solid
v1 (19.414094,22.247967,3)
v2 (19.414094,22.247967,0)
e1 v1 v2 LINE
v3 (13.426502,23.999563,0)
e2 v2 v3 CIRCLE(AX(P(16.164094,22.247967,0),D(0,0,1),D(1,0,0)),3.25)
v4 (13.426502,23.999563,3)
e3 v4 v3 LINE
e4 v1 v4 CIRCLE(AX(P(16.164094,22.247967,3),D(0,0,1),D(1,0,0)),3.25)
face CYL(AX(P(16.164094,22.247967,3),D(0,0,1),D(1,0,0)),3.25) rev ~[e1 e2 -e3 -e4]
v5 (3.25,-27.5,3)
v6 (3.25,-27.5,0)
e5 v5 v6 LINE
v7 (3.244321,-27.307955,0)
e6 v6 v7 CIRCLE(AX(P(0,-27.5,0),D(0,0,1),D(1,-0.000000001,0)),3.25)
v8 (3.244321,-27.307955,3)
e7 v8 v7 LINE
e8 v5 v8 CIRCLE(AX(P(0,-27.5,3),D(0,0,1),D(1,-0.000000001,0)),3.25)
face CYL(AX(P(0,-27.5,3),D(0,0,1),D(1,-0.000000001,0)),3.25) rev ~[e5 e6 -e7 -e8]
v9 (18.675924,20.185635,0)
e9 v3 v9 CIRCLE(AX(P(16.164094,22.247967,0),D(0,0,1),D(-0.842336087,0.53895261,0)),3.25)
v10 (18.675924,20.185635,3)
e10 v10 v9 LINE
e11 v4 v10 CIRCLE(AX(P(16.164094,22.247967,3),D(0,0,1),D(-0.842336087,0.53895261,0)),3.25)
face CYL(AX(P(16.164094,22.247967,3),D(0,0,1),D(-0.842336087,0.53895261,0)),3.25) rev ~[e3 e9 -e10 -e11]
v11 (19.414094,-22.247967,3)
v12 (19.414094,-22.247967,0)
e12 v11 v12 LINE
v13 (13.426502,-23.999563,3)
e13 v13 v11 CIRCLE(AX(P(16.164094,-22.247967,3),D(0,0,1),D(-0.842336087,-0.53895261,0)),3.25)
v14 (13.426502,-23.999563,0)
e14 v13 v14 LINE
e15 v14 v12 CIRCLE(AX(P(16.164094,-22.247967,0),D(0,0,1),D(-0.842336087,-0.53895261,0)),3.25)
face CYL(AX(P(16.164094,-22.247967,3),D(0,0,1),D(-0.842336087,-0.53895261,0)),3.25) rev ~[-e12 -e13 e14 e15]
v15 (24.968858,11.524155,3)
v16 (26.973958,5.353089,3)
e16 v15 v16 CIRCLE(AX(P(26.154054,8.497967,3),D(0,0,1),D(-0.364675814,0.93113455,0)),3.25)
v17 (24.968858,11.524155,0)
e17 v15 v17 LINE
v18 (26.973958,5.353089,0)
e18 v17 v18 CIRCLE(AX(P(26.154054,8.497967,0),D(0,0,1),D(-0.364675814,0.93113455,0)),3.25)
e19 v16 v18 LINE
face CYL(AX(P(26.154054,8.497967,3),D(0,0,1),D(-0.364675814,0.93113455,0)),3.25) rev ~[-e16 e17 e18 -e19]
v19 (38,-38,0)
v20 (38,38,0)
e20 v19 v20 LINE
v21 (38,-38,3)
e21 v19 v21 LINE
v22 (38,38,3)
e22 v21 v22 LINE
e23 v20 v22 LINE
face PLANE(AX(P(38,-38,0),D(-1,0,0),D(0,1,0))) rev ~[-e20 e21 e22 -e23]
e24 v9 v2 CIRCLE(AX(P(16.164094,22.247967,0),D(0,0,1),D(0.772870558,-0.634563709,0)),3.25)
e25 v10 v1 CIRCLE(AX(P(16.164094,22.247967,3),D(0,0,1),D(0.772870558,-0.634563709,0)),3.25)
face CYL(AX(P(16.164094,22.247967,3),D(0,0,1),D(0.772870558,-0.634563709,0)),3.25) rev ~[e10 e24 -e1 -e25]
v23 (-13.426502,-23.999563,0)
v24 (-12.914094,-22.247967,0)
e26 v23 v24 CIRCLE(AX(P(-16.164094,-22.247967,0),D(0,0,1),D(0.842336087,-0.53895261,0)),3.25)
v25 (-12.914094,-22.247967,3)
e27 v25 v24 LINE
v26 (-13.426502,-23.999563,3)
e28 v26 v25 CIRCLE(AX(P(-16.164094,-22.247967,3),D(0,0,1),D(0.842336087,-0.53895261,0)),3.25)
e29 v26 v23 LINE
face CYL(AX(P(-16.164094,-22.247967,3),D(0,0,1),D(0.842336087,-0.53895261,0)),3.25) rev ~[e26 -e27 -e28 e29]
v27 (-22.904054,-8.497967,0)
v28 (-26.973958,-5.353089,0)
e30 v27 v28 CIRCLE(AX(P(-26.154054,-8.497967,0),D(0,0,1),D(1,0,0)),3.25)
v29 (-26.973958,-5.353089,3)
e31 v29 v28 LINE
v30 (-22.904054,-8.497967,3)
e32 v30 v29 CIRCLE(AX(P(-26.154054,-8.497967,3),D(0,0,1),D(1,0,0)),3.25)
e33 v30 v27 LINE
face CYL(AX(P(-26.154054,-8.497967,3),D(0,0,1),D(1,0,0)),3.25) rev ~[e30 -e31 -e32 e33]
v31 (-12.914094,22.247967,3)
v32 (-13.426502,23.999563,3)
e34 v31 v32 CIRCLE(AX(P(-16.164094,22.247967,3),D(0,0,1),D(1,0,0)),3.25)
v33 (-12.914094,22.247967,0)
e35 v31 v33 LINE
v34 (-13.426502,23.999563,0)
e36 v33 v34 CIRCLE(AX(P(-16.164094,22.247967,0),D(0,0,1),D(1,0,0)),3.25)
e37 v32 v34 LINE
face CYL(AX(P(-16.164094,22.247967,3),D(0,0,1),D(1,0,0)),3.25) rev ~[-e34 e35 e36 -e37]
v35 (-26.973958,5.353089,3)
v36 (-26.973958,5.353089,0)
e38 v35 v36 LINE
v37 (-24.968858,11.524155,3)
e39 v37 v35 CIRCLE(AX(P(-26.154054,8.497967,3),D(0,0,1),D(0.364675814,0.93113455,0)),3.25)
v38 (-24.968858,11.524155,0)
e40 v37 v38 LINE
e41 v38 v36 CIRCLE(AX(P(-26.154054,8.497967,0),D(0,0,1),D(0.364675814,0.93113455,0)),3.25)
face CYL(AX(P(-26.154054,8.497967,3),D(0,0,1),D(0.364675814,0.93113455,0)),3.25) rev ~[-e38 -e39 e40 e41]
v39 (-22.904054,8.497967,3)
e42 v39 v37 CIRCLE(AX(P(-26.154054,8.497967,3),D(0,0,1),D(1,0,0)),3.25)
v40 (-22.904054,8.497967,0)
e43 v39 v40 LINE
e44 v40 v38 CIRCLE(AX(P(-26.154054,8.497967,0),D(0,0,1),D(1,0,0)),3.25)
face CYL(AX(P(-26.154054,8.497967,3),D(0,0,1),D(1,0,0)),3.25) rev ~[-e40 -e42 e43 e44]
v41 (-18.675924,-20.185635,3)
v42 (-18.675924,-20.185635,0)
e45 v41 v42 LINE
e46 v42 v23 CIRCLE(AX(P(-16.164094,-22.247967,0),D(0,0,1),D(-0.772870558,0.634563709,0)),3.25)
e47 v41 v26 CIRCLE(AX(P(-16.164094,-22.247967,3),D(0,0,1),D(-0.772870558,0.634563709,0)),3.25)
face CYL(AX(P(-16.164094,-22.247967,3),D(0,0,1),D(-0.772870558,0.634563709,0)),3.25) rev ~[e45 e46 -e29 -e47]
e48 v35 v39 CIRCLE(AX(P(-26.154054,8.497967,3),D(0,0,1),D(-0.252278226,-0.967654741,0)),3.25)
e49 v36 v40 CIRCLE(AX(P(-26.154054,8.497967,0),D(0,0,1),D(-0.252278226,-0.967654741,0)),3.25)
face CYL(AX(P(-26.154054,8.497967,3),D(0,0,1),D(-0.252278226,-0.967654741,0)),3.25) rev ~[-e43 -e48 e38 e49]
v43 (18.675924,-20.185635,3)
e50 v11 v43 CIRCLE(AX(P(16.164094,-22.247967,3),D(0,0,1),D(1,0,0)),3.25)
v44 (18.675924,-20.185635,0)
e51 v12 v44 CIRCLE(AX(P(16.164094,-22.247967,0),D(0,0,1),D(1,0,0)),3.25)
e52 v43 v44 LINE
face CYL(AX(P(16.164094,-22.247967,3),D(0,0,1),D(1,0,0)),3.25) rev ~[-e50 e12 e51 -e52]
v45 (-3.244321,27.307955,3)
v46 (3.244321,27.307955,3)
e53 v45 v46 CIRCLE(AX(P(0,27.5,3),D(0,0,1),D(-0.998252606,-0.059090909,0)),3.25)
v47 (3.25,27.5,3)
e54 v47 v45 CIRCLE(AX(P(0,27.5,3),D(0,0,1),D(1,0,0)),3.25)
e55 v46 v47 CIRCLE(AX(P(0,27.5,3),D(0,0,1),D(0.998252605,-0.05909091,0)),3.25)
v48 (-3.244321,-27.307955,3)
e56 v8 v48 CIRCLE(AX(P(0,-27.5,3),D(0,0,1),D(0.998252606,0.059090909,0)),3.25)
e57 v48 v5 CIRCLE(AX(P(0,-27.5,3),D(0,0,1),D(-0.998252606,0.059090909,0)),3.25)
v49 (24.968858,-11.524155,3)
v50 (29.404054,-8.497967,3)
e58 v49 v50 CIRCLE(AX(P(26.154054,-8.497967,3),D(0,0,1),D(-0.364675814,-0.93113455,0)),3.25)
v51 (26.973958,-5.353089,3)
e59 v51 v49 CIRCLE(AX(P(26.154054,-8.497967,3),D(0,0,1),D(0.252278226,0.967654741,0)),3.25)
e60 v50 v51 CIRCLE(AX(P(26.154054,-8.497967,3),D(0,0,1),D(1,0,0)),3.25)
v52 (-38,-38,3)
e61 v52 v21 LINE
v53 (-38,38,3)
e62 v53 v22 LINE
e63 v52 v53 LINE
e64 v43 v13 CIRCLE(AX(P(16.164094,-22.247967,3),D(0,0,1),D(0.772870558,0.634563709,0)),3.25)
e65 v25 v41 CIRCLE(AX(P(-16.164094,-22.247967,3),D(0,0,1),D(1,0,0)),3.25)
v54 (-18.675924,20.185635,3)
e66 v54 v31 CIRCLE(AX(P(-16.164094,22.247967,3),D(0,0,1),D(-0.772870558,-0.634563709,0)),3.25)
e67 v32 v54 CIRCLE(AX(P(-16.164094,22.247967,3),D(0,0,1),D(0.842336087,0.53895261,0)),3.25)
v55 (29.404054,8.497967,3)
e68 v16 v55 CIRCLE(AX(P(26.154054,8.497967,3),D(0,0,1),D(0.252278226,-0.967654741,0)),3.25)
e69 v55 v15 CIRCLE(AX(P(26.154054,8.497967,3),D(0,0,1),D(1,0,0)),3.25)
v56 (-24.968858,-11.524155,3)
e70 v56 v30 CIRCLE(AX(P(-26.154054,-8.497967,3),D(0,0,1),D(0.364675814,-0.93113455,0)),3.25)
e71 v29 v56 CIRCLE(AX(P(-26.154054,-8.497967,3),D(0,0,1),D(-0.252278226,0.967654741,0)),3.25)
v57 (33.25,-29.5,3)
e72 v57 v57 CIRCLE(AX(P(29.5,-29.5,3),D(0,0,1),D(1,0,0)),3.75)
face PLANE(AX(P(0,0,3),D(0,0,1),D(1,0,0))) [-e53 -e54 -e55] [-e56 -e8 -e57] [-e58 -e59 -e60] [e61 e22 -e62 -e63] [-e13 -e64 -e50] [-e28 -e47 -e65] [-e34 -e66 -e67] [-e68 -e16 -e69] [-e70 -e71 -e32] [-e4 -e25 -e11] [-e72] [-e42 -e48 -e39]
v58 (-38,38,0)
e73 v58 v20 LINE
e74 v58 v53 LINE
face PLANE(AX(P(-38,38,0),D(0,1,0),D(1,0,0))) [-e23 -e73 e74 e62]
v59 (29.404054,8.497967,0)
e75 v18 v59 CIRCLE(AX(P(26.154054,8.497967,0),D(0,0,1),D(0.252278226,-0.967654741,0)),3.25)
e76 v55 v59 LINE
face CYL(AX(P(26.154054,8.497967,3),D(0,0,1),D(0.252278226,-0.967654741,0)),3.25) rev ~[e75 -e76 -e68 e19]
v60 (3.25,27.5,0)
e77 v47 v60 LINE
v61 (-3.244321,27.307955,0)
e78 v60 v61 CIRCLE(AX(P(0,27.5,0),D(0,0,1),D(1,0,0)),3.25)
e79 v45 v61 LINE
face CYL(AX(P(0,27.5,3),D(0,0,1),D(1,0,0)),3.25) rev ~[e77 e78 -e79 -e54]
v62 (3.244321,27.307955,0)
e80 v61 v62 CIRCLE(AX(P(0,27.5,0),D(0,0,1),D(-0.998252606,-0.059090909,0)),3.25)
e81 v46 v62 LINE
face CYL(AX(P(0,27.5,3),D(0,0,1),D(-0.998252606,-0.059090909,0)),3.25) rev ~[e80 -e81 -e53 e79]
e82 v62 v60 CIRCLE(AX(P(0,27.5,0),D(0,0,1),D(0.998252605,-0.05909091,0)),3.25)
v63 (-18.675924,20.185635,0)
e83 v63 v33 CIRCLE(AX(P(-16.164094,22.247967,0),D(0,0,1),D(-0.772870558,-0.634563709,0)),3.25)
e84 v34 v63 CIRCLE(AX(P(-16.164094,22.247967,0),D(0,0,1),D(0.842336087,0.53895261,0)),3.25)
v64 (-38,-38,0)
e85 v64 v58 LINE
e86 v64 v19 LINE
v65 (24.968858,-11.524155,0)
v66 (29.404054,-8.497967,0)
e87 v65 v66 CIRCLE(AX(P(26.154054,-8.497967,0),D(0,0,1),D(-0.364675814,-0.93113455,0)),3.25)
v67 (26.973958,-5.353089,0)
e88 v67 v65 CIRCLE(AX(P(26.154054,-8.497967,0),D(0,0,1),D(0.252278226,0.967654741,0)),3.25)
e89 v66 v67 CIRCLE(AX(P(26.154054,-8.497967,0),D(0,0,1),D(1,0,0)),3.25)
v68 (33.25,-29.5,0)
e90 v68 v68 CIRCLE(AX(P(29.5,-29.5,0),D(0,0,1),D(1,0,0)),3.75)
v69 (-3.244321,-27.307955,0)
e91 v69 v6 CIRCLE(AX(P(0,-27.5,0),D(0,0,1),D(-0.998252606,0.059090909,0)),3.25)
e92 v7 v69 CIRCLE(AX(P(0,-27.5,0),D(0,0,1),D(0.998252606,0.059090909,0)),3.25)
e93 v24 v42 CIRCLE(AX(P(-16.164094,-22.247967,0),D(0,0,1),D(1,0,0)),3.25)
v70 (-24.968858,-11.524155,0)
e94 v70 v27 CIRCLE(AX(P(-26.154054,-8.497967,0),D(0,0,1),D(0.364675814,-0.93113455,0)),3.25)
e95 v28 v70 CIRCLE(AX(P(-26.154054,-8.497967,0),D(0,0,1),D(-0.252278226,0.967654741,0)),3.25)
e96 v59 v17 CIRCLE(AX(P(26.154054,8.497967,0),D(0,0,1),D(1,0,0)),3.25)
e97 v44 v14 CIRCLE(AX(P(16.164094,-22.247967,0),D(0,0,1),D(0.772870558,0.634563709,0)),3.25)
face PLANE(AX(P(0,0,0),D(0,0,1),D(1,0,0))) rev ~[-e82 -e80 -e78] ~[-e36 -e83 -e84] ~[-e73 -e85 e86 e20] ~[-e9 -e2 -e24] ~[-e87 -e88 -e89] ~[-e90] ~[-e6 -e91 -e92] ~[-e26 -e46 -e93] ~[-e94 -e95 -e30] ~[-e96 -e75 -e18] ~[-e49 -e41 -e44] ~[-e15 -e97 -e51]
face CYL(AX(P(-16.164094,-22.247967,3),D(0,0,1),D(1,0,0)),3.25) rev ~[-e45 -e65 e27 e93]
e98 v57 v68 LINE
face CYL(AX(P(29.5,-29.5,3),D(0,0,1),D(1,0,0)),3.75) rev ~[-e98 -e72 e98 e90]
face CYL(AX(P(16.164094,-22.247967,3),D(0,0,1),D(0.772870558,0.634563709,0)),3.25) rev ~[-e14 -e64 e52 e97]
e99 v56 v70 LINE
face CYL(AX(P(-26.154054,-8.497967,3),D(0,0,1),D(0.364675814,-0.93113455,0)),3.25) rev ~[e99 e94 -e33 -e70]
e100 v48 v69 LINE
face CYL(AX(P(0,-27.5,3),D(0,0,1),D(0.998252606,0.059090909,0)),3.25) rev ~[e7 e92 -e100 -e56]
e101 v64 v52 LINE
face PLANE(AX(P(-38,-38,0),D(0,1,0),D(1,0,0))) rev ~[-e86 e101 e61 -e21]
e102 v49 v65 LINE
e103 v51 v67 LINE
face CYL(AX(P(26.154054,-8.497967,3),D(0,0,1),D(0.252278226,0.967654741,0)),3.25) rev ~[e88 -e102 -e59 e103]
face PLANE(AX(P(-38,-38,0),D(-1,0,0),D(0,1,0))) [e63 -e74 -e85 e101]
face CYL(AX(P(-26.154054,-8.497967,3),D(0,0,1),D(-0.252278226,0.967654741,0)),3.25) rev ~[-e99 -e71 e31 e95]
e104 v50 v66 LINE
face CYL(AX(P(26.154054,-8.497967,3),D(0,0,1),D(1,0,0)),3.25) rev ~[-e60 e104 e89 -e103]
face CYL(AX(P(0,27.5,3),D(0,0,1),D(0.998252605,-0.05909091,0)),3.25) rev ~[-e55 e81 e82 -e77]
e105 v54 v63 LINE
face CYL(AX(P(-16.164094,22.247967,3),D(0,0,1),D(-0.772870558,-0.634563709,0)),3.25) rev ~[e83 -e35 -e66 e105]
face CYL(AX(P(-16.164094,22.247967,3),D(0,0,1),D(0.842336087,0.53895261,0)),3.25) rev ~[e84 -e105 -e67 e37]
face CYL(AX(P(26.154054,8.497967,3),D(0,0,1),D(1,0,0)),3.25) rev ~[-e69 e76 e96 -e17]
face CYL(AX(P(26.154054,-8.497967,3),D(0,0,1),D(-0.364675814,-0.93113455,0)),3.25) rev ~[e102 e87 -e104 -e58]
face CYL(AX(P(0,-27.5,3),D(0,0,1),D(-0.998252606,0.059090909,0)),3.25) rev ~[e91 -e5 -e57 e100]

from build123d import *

# Parameters (mm, degrees)
F0_W     = 76
F0_H     = 76
F1_DEPTH = 3
F3_DEPTH = 25
F4_R     = 3.75
F5_DEPTH = 25


with BuildPart() as f1:
    # F0 (on Top) → F1 (new body)
    with BuildSketch(Plane.XY):
        Rectangle(F0_W, F0_H)
    extrude(amount=F1_DEPTH)

    # F2 (on face) → F3 (cut)
    with BuildSketch(Plane.XY.offset(3)):
        with BuildLine():
            ThreePointArc((24.9688578028, 11.5241546337), (23.0631205202, 7.4936621136), (26.9739584315, 5.3530894386))
            ThreePointArc((26.9739584315, 5.3530894386), (26.1540541981, 8.4979673453), (24.9688578028, 11.5241546337))
        make_face()
        with BuildLine():
            ThreePointArc((24.9688578028, 11.5241546337), (26.1540541981, 8.4979673453), (26.9739584315, 5.3530894386))
            ThreePointArc((26.9739584315, 5.3530894386), (28.7257451553, 6.5107819939), (29.4040541981, 8.4979673453))
            ThreePointArc((29.4040541981, 8.4979673453), (27.9858035963, 11.1825891329), (24.9688578028, 11.5241546337))
        make_face()
        with BuildLine():
            ThreePointArc((29.4040541981, -8.4979673453), (28.7257451553, -6.5107819939), (26.9739584315, -5.3530894386))
            ThreePointArc((26.9739584315, -5.3530894386), (26.1540541981, -8.4979673453), (24.9688578028, -11.5241546337))
            ThreePointArc((24.9688578028, -11.5241546337), (27.9858035963, -11.1825891329), (29.4040541981, -8.4979673453))
        make_face()
        with BuildLine():
            ThreePointArc((24.9688578028, -11.5241546337), (26.1540541981, -8.4979673453), (26.9739584315, -5.3530894386))
            ThreePointArc((26.9739584315, -5.3530894386), (23.0631205202, -7.4936621136), (24.9688578028, -11.5241546337))
        make_face()
        with BuildLine():
            ThreePointArc((13.4265021538, 23.9995633276), (14.2537923681, 19.6186621136), (18.6759237504, 20.1856352902))
            ThreePointArc((18.6759237504, 20.1856352902), (16.164094438, 22.2479673453), (13.4265021538, 23.9995633276))
        make_face()
        with BuildLine():
            ThreePointArc((13.4265021538, 23.9995633276), (16.164094438, 22.2479673453), (18.6759237504, 20.1856352902))
            ThreePointArc((18.6759237504, 20.1856352902), (19.2239919253, 21.1527379778), (19.414094438, 22.2479673453))
            ThreePointArc((19.414094438, 22.2479673453), (17.0765978836, 25.3672360836), (13.4265021538, 23.9995633276))
        make_face()
        with BuildLine():
            ThreePointArc((19.414094438, -22.2479673453), (19.2239919253, -21.1527379778), (18.6759237504, -20.1856352902))
            ThreePointArc((18.6759237504, -20.1856352902), (16.164094438, -22.2479673453), (13.4265021538, -23.9995633276))
            ThreePointArc((13.4265021538, -23.9995633276), (17.0765978836, -25.3672360836), (19.414094438, -22.2479673453))
        make_face()
        with BuildLine():
            ThreePointArc((13.4265021538, -23.9995633276), (16.164094438, -22.2479673453), (18.6759237504, -20.1856352902))
            ThreePointArc((18.6759237504, -20.1856352902), (14.2537923681, -19.6186621136), (13.4265021538, -23.9995633276))
        make_face()
        with BuildLine():
            ThreePointArc((-3.244320968, 27.3079545455), (0, 24.25), (3.244320968, 27.3079545455))
            ThreePointArc((3.244320968, 27.3079545455), (0, 27.5), (-3.244320968, 27.3079545455))
        make_face()
        with BuildLine():
            ThreePointArc((-3.244320968, 27.3079545455), (0, 27.5), (3.244320968, 27.3079545455))
            ThreePointArc((3.244320968, 27.3079545455), (3.2485799318, 27.4039352978), (3.25, 27.5))
            ThreePointArc((3.25, 27.5), (-0.0960647022, 30.7485799318), (-3.244320968, 27.3079545455))
        make_face()
        with BuildLine():
            ThreePointArc((3.25, -27.5), (3.2485799318, -27.4039352978), (3.244320968, -27.3079545455))
            ThreePointArc((3.244320968, -27.3079545455), (0, -27.5), (-3.244320968, -27.3079545455))
            ThreePointArc((-3.244320968, -27.3079545455), (-0.0960647022, -30.7485799318), (3.25, -27.5))
        make_face()
        with BuildLine():
            ThreePointArc((-3.244320968, -27.3079545455), (0, -27.5), (3.244320968, -27.3079545455))
            ThreePointArc((3.244320968, -27.3079545455), (0, -24.25), (-3.244320968, -27.3079545455))
        make_face()
        with BuildLine():
            ThreePointArc((-12.914094438, 22.2479673453), (-13.0448256997, 23.1604707908), (-13.4265021538, 23.9995633276))
            ThreePointArc((-13.4265021538, 23.9995633276), (-16.164094438, 22.2479673453), (-18.6759237504, 20.1856352902))
            ThreePointArc((-18.6759237504, 20.1856352902), (-15.0688650706, 19.188069858), (-12.914094438, 22.2479673453))
        make_face()
        with BuildLine():
            ThreePointArc((-18.6759237504, 20.1856352902), (-16.164094438, 22.2479673453), (-13.4265021538, 23.9995633276))
            ThreePointArc((-13.4265021538, 23.9995633276), (-18.074396508, 24.877272577), (-18.6759237504, 20.1856352902))
        make_face()
        with BuildLine():
            ThreePointArc((-18.6759237504, -20.1856352902), (-18.074396508, -24.877272577), (-13.4265021538, -23.9995633276))
            ThreePointArc((-13.4265021538, -23.9995633276), (-16.164094438, -22.2479673453), (-18.6759237504, -20.1856352902))
        make_face()
        with BuildLine():
            ThreePointArc((-18.6759237504, -20.1856352902), (-16.164094438, -22.2479673453), (-13.4265021538, -23.9995633276))
            ThreePointArc((-13.4265021538, -23.9995633276), (-13.0448256997, -23.1604707908), (-12.914094438, -22.2479673453))
            ThreePointArc((-12.914094438, -22.2479673453), (-15.0688650706, -19.188069858), (-18.6759237504, -20.1856352902))
        make_face()
        with BuildLine():
            ThreePointArc((-22.9040541981, 8.4979673453), (-23.4694324105, 10.3297167435), (-24.9688578028, 11.5241546337))
            ThreePointArc((-24.9688578028, 11.5241546337), (-26.1540541981, 8.4979673453), (-26.9739584315, 5.3530894386))
            ThreePointArc((-26.9739584315, 5.3530894386), (-24.1668688467, 5.9262763881), (-22.9040541981, 8.4979673453))
        make_face()
        with BuildLine():
            ThreePointArc((-26.9739584315, 5.3530894386), (-26.1540541981, 8.4979673453), (-24.9688578028, 11.5241546337))
            ThreePointArc((-24.9688578028, 11.5241546337), (-29.2449878761, 9.502272577), (-26.9739584315, 5.3530894386))
        make_face()
        with BuildLine():
            ThreePointArc((-26.9739584315, -5.3530894386), (-29.2449878761, -9.502272577), (-24.9688578028, -11.5241546337))
            ThreePointArc((-24.9688578028, -11.5241546337), (-26.1540541981, -8.4979673453), (-26.9739584315, -5.3530894386))
        make_face()
        with BuildLine():
            ThreePointArc((-26.9739584315, -5.3530894386), (-26.1540541981, -8.4979673453), (-24.9688578028, -11.5241546337))
            ThreePointArc((-24.9688578028, -11.5241546337), (-23.4694324105, -10.3297167435), (-22.9040541981, -8.4979673453))
            ThreePointArc((-22.9040541981, -8.4979673453), (-24.1668688467, -5.9262763881), (-26.9739584315, -5.3530894386))
        make_face()
    extrude(amount=-F3_DEPTH, mode=Mode.SUBTRACT)

    # F4 (on face) → F5 (cut)
    with BuildSketch(Plane.XY.offset(3)):
        with Locations((29.5, -29.5)):
            Circle(F4_R)
    extrude(amount=-F5_DEPTH, mode=Mode.SUBTRACT)


solid = f1.part
